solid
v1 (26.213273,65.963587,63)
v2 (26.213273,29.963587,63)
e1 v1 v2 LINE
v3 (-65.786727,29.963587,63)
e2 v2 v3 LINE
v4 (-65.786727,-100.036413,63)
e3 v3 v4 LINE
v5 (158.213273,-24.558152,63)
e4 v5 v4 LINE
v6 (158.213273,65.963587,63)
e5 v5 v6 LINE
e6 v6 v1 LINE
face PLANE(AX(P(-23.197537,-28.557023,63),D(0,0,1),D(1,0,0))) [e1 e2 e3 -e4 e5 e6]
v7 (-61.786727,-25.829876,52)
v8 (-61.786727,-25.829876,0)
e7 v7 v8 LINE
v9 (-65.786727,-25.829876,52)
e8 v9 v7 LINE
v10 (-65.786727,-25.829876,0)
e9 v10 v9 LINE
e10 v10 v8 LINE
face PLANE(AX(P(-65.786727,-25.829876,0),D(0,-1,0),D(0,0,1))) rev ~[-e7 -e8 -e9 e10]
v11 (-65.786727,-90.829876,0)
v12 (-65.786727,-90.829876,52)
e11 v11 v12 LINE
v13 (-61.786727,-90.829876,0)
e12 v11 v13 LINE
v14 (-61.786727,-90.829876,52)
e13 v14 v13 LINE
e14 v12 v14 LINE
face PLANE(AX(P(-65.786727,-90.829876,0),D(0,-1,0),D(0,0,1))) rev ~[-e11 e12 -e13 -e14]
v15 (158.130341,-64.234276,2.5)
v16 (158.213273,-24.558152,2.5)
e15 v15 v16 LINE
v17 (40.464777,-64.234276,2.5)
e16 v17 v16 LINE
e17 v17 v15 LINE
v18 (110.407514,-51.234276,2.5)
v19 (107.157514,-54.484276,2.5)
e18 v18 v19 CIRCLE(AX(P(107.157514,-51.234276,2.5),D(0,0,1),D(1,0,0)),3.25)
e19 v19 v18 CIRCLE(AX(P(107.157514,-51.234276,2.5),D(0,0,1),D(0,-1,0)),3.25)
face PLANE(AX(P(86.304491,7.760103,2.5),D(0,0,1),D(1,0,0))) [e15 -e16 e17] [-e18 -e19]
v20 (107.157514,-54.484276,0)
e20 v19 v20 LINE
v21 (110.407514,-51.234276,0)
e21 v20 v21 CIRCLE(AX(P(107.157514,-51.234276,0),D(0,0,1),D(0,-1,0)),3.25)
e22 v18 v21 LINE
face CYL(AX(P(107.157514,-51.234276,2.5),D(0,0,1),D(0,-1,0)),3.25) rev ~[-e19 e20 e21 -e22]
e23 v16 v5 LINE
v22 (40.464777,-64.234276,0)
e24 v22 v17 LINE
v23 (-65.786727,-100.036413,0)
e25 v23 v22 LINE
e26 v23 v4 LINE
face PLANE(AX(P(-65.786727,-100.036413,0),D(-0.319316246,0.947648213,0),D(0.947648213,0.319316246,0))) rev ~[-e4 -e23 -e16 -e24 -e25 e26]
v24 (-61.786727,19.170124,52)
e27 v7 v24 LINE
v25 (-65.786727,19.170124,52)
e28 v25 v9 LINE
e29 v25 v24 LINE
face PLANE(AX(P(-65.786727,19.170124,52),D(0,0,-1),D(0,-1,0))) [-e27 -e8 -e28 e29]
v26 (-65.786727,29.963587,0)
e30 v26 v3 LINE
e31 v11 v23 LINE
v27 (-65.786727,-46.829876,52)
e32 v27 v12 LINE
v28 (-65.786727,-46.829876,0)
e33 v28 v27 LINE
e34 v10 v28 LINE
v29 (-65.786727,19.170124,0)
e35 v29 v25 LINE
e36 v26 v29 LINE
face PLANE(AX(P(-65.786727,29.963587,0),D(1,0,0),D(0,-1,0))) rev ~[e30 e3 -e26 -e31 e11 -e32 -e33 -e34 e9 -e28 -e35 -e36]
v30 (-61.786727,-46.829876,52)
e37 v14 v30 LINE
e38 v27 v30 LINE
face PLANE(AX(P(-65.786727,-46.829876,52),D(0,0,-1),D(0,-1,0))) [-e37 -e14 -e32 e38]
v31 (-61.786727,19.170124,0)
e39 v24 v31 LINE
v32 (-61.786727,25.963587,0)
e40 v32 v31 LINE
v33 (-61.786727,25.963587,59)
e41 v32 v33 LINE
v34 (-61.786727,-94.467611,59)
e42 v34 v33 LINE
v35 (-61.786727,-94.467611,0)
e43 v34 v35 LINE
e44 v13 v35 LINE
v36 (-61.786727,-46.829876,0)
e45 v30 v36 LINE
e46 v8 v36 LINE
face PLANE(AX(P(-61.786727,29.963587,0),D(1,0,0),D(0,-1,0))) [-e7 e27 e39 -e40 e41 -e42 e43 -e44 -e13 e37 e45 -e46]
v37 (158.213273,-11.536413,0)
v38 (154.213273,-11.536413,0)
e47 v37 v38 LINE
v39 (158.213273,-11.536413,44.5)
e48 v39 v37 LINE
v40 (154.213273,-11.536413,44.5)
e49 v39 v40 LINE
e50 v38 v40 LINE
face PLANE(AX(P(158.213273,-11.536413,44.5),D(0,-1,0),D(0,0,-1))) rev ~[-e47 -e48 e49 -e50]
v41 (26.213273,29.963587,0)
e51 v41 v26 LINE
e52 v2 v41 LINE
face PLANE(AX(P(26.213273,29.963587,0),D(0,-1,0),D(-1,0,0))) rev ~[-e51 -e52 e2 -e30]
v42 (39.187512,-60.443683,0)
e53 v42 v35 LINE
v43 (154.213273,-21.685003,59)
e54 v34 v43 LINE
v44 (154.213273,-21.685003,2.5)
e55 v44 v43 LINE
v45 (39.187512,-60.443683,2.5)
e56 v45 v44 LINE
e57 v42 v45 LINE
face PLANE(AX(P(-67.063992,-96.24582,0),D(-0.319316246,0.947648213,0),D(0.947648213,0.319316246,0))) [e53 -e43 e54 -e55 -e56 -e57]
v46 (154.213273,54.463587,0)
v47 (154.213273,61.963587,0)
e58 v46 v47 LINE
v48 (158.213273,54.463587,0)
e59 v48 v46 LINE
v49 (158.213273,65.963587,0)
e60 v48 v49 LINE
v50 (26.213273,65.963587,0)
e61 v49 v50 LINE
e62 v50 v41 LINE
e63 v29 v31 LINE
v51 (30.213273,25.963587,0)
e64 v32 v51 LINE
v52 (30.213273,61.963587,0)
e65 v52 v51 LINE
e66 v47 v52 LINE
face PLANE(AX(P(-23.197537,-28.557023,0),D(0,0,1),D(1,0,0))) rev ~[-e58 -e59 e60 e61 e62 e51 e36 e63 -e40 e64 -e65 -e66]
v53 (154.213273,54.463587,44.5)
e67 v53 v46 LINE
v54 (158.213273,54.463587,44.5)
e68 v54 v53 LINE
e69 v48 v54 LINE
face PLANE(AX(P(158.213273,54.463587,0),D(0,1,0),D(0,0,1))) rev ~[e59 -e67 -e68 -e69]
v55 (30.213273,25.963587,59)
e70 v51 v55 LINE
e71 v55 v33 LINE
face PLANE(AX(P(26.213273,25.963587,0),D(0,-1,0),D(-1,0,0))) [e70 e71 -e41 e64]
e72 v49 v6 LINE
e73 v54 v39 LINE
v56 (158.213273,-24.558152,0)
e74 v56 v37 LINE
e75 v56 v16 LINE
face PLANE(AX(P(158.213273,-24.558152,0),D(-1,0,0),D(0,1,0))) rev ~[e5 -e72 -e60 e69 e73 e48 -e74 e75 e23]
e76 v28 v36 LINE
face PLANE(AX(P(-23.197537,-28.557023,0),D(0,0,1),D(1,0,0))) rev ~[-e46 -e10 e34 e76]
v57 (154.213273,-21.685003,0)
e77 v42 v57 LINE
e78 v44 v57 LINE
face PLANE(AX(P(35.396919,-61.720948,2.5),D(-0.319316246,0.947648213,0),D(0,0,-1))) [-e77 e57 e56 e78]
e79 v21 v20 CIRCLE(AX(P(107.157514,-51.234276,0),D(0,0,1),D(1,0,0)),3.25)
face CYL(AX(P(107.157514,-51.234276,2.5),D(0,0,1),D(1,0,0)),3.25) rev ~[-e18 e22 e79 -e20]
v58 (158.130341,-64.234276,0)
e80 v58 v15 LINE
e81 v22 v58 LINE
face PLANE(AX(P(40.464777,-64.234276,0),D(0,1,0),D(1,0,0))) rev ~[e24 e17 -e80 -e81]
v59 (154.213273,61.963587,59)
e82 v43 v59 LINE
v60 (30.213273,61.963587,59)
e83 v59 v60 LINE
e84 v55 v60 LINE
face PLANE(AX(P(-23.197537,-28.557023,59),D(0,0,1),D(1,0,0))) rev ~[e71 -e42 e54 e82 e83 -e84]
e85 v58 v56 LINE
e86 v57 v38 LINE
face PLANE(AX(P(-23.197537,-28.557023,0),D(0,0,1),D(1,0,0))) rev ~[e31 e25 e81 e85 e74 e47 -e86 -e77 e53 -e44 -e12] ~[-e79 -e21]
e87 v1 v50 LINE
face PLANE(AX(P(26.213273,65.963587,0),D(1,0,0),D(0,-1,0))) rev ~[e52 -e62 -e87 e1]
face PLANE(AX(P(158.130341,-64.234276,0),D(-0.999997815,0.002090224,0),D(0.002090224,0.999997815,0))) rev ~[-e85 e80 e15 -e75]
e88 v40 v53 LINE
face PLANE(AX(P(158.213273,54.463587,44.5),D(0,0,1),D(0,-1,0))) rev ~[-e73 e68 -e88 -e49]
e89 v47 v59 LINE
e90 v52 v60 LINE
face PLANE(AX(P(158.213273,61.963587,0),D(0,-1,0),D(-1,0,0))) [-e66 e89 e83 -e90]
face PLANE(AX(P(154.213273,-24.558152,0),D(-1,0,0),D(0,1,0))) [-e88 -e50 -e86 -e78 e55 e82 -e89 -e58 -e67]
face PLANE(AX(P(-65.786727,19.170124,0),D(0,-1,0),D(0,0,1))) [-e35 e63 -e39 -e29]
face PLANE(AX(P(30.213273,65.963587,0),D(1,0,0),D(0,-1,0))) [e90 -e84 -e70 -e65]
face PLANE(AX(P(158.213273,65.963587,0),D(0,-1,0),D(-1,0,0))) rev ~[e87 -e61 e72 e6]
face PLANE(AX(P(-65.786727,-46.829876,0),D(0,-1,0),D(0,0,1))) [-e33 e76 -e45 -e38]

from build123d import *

# Parameters (mm, degrees)
F1_DEPTH    = 63
F2_DEPTH    = 2.5
F3_T        = 4
F3_T3_DEPTH = 132.2533825366
F3_T5_DEPTH = 10.5
F3_T7_DEPTH = 71
F4_W        = 44
F4_H        = 52
F4_W_2      = 45
F5_DEPTH    = 4.5
F7_DEPTH    = 5
F9_DEPTH    = 25


# Not quite as in the source:
# - a shell that OpenCascade refuses in one call is made with other operations: the cavity is built on its own and cut out


with BuildPart() as f1:
    # F0 (on Top) → F1 (new body)
    with BuildSketch(Plane.XY):
        Polygon((26.2132732272, -24.0364130735), (26.2132732272, 29.9635869265), (-65.7867267728, 29.9635869265), (-65.7867267728, -100.0364130735), (26.2132732272, -69.0364130735), align=None)
        Polygon((158.2132732272, 65.9635869265), (26.2132732272, 65.9635869265), (26.2132732272, 29.9635869265), (26.2132732272, -24.0364130735), (26.2132732272, -69.0364130735), (40.4647773284, -64.234275822), (158.2132732272, -24.558152204), align=None)
    extrude(amount=F1_DEPTH)

    # F0 (on Top) → F2 (join)
    with BuildSketch(Plane.XY):
        Polygon((158.2132732272, 65.9635869265), (26.2132732272, 65.9635869265), (26.2132732272, 29.9635869265), (26.2132732272, -24.0364130735), (26.2132732272, -69.0364130735), (40.4647773284, -64.234275822), (158.2132732272, -24.558152204), align=None)
        Polygon((26.2132732272, -24.0364130735), (26.2132732272, 29.9635869265), (-65.7867267728, 29.9635869265), (-65.7867267728, -100.0364130735), (26.2132732272, -69.0364130735), align=None)
        Polygon((158.1303410754, -64.234275822), (158.2132732272, -24.558152204), (40.4647773284, -64.234275822), align=None)
    extrude(amount=F2_DEPTH)

    # F3: shell of thickness 4, made by hand


with BuildPart() as f3_core1:
    # F3_t2: copy of F1
    add(f1.part)

    # the walls: a layer under each face that stays
    f3_faces = [f3_core1.faces().sort_by_distance(p)[0] for p in [
        (46.2132732272, -62.2972826388, 31.5),
        (99.2975592019, -64.234275822, 1.25),
        (158.1718071513, -44.396214013, 1.25),
        (99.3390252778, -57.6215885524, 2.5),
        (158.2132732272, 20.7027173612, 31.5),
        (92.2132732272, 65.9635869265, 31.5),
        (26.2132732272, 47.9635869265, 31.5),
        (-19.7867267728, 29.9635869265, 31.5),
        (46.2132732272, -17.0364130735, 63),
        (-65.7867267728, -35.0364130735, 31.5),
    ]]
    thicken(f3_faces, amount=-F3_T, mode=Mode.SUBTRACT)

    # F3_s4 → F3_t3 (cut)
    with BuildSketch(Plane(origin=(13.1110220732, 4.4178443942, 0), x_dir=(0, 0, 1), z_dir=(0.9476482128, 0.3193162456, 0))):
        Polygon((2.54, 73.8325574618), (2.5, 69.7925574618), (-1.5, 69.7925574618), (-1.5, 73.7925574618), align=None)
    extrude(amount=F3_T3_DEPTH, mode=Mode.SUBTRACT)

    # F3_s6 → F3_t5 (cut)
    with BuildSketch(Plane.XY.offset(-4)):
        Polygon((40.4775499783, -64.3121817506), (39.1875123459, -60.4436829707), (39.8089787227, -60.234275822), (40.4647773284, -60.234275822), align=None)
    extrude(amount=F3_T5_DEPTH, mode=Mode.SUBTRACT)

    # F3_s8 → F3_t7 (cut)
    with BuildSketch(Plane.XY.offset(-4)):
        Polygon((26.1732732272, 30.0035869265), (30.2132732272, 29.9635869265), (30.2132732272, 25.9635869265), (26.2132732272, 25.9635869265), align=None)
    extrude(amount=F3_T7_DEPTH, mode=Mode.SUBTRACT)


with BuildPart() as f1_1:
    add(f1.part)

    # what is left inside the walls is the cavity
    f3_cavity = [f3_core1.part.solids().sort_by_distance(p)[0] for p in [
        (46.213273, -42.323879, 0.04),
    ]]
    add(f3_cavity, mode=Mode.SUBTRACT)

    # F4 (on face) → F5 (cut)
    with BuildSketch(Plane(origin=(-65.7867267728, 0, 0), x_dir=(0, -1, 0), z_dir=(-1, 0, 0))):
        with Locations((68.8298759162, 26)):
            Rectangle(F4_W, F4_H)
        with Locations((3.3298759162, 26)):
            Rectangle(F4_W_2, F4_H)
    extrude(amount=-F5_DEPTH, mode=Mode.SUBTRACT)

    # F6 (on face) → F7 (cut)
    with BuildSketch(Plane.YZ.offset(158.2132732272)):
        Polygon((36.0559523106, 44.5), (-11.5364130735, 44.5), (-11.5364130735, 0), (54.4635869265, 0), (54.4635869265, 44.5), align=None)
    extrude(amount=-F7_DEPTH, mode=Mode.SUBTRACT)

    # F8 (on face) → F9 (cut)
    with BuildSketch(Plane.XY.offset(2.5)):
        with BuildLine():
            ThreePointArc((107.1575140418, -54.484275822), (109.4556110807, -53.5323728609), (110.4075140418, -51.234275822))
            Line((110.4075140418, -51.234275822), (107.1575140418, -51.234275822))
            Line((107.1575140418, -51.234275822), (107.1575140418, -54.484275822))
        make_face()
        with BuildLine():
            Line((107.1575140418, -51.234275822), (110.4075140418, -51.234275822))
            ThreePointArc((110.4075140418, -51.234275822), (104.859417003, -48.9361787832), (107.1575140418, -54.484275822))
            Line((107.1575140418, -54.484275822), (107.1575140418, -51.234275822))
        make_face()
    extrude(amount=-F9_DEPTH, mode=Mode.SUBTRACT)


solid = f1_1.part
